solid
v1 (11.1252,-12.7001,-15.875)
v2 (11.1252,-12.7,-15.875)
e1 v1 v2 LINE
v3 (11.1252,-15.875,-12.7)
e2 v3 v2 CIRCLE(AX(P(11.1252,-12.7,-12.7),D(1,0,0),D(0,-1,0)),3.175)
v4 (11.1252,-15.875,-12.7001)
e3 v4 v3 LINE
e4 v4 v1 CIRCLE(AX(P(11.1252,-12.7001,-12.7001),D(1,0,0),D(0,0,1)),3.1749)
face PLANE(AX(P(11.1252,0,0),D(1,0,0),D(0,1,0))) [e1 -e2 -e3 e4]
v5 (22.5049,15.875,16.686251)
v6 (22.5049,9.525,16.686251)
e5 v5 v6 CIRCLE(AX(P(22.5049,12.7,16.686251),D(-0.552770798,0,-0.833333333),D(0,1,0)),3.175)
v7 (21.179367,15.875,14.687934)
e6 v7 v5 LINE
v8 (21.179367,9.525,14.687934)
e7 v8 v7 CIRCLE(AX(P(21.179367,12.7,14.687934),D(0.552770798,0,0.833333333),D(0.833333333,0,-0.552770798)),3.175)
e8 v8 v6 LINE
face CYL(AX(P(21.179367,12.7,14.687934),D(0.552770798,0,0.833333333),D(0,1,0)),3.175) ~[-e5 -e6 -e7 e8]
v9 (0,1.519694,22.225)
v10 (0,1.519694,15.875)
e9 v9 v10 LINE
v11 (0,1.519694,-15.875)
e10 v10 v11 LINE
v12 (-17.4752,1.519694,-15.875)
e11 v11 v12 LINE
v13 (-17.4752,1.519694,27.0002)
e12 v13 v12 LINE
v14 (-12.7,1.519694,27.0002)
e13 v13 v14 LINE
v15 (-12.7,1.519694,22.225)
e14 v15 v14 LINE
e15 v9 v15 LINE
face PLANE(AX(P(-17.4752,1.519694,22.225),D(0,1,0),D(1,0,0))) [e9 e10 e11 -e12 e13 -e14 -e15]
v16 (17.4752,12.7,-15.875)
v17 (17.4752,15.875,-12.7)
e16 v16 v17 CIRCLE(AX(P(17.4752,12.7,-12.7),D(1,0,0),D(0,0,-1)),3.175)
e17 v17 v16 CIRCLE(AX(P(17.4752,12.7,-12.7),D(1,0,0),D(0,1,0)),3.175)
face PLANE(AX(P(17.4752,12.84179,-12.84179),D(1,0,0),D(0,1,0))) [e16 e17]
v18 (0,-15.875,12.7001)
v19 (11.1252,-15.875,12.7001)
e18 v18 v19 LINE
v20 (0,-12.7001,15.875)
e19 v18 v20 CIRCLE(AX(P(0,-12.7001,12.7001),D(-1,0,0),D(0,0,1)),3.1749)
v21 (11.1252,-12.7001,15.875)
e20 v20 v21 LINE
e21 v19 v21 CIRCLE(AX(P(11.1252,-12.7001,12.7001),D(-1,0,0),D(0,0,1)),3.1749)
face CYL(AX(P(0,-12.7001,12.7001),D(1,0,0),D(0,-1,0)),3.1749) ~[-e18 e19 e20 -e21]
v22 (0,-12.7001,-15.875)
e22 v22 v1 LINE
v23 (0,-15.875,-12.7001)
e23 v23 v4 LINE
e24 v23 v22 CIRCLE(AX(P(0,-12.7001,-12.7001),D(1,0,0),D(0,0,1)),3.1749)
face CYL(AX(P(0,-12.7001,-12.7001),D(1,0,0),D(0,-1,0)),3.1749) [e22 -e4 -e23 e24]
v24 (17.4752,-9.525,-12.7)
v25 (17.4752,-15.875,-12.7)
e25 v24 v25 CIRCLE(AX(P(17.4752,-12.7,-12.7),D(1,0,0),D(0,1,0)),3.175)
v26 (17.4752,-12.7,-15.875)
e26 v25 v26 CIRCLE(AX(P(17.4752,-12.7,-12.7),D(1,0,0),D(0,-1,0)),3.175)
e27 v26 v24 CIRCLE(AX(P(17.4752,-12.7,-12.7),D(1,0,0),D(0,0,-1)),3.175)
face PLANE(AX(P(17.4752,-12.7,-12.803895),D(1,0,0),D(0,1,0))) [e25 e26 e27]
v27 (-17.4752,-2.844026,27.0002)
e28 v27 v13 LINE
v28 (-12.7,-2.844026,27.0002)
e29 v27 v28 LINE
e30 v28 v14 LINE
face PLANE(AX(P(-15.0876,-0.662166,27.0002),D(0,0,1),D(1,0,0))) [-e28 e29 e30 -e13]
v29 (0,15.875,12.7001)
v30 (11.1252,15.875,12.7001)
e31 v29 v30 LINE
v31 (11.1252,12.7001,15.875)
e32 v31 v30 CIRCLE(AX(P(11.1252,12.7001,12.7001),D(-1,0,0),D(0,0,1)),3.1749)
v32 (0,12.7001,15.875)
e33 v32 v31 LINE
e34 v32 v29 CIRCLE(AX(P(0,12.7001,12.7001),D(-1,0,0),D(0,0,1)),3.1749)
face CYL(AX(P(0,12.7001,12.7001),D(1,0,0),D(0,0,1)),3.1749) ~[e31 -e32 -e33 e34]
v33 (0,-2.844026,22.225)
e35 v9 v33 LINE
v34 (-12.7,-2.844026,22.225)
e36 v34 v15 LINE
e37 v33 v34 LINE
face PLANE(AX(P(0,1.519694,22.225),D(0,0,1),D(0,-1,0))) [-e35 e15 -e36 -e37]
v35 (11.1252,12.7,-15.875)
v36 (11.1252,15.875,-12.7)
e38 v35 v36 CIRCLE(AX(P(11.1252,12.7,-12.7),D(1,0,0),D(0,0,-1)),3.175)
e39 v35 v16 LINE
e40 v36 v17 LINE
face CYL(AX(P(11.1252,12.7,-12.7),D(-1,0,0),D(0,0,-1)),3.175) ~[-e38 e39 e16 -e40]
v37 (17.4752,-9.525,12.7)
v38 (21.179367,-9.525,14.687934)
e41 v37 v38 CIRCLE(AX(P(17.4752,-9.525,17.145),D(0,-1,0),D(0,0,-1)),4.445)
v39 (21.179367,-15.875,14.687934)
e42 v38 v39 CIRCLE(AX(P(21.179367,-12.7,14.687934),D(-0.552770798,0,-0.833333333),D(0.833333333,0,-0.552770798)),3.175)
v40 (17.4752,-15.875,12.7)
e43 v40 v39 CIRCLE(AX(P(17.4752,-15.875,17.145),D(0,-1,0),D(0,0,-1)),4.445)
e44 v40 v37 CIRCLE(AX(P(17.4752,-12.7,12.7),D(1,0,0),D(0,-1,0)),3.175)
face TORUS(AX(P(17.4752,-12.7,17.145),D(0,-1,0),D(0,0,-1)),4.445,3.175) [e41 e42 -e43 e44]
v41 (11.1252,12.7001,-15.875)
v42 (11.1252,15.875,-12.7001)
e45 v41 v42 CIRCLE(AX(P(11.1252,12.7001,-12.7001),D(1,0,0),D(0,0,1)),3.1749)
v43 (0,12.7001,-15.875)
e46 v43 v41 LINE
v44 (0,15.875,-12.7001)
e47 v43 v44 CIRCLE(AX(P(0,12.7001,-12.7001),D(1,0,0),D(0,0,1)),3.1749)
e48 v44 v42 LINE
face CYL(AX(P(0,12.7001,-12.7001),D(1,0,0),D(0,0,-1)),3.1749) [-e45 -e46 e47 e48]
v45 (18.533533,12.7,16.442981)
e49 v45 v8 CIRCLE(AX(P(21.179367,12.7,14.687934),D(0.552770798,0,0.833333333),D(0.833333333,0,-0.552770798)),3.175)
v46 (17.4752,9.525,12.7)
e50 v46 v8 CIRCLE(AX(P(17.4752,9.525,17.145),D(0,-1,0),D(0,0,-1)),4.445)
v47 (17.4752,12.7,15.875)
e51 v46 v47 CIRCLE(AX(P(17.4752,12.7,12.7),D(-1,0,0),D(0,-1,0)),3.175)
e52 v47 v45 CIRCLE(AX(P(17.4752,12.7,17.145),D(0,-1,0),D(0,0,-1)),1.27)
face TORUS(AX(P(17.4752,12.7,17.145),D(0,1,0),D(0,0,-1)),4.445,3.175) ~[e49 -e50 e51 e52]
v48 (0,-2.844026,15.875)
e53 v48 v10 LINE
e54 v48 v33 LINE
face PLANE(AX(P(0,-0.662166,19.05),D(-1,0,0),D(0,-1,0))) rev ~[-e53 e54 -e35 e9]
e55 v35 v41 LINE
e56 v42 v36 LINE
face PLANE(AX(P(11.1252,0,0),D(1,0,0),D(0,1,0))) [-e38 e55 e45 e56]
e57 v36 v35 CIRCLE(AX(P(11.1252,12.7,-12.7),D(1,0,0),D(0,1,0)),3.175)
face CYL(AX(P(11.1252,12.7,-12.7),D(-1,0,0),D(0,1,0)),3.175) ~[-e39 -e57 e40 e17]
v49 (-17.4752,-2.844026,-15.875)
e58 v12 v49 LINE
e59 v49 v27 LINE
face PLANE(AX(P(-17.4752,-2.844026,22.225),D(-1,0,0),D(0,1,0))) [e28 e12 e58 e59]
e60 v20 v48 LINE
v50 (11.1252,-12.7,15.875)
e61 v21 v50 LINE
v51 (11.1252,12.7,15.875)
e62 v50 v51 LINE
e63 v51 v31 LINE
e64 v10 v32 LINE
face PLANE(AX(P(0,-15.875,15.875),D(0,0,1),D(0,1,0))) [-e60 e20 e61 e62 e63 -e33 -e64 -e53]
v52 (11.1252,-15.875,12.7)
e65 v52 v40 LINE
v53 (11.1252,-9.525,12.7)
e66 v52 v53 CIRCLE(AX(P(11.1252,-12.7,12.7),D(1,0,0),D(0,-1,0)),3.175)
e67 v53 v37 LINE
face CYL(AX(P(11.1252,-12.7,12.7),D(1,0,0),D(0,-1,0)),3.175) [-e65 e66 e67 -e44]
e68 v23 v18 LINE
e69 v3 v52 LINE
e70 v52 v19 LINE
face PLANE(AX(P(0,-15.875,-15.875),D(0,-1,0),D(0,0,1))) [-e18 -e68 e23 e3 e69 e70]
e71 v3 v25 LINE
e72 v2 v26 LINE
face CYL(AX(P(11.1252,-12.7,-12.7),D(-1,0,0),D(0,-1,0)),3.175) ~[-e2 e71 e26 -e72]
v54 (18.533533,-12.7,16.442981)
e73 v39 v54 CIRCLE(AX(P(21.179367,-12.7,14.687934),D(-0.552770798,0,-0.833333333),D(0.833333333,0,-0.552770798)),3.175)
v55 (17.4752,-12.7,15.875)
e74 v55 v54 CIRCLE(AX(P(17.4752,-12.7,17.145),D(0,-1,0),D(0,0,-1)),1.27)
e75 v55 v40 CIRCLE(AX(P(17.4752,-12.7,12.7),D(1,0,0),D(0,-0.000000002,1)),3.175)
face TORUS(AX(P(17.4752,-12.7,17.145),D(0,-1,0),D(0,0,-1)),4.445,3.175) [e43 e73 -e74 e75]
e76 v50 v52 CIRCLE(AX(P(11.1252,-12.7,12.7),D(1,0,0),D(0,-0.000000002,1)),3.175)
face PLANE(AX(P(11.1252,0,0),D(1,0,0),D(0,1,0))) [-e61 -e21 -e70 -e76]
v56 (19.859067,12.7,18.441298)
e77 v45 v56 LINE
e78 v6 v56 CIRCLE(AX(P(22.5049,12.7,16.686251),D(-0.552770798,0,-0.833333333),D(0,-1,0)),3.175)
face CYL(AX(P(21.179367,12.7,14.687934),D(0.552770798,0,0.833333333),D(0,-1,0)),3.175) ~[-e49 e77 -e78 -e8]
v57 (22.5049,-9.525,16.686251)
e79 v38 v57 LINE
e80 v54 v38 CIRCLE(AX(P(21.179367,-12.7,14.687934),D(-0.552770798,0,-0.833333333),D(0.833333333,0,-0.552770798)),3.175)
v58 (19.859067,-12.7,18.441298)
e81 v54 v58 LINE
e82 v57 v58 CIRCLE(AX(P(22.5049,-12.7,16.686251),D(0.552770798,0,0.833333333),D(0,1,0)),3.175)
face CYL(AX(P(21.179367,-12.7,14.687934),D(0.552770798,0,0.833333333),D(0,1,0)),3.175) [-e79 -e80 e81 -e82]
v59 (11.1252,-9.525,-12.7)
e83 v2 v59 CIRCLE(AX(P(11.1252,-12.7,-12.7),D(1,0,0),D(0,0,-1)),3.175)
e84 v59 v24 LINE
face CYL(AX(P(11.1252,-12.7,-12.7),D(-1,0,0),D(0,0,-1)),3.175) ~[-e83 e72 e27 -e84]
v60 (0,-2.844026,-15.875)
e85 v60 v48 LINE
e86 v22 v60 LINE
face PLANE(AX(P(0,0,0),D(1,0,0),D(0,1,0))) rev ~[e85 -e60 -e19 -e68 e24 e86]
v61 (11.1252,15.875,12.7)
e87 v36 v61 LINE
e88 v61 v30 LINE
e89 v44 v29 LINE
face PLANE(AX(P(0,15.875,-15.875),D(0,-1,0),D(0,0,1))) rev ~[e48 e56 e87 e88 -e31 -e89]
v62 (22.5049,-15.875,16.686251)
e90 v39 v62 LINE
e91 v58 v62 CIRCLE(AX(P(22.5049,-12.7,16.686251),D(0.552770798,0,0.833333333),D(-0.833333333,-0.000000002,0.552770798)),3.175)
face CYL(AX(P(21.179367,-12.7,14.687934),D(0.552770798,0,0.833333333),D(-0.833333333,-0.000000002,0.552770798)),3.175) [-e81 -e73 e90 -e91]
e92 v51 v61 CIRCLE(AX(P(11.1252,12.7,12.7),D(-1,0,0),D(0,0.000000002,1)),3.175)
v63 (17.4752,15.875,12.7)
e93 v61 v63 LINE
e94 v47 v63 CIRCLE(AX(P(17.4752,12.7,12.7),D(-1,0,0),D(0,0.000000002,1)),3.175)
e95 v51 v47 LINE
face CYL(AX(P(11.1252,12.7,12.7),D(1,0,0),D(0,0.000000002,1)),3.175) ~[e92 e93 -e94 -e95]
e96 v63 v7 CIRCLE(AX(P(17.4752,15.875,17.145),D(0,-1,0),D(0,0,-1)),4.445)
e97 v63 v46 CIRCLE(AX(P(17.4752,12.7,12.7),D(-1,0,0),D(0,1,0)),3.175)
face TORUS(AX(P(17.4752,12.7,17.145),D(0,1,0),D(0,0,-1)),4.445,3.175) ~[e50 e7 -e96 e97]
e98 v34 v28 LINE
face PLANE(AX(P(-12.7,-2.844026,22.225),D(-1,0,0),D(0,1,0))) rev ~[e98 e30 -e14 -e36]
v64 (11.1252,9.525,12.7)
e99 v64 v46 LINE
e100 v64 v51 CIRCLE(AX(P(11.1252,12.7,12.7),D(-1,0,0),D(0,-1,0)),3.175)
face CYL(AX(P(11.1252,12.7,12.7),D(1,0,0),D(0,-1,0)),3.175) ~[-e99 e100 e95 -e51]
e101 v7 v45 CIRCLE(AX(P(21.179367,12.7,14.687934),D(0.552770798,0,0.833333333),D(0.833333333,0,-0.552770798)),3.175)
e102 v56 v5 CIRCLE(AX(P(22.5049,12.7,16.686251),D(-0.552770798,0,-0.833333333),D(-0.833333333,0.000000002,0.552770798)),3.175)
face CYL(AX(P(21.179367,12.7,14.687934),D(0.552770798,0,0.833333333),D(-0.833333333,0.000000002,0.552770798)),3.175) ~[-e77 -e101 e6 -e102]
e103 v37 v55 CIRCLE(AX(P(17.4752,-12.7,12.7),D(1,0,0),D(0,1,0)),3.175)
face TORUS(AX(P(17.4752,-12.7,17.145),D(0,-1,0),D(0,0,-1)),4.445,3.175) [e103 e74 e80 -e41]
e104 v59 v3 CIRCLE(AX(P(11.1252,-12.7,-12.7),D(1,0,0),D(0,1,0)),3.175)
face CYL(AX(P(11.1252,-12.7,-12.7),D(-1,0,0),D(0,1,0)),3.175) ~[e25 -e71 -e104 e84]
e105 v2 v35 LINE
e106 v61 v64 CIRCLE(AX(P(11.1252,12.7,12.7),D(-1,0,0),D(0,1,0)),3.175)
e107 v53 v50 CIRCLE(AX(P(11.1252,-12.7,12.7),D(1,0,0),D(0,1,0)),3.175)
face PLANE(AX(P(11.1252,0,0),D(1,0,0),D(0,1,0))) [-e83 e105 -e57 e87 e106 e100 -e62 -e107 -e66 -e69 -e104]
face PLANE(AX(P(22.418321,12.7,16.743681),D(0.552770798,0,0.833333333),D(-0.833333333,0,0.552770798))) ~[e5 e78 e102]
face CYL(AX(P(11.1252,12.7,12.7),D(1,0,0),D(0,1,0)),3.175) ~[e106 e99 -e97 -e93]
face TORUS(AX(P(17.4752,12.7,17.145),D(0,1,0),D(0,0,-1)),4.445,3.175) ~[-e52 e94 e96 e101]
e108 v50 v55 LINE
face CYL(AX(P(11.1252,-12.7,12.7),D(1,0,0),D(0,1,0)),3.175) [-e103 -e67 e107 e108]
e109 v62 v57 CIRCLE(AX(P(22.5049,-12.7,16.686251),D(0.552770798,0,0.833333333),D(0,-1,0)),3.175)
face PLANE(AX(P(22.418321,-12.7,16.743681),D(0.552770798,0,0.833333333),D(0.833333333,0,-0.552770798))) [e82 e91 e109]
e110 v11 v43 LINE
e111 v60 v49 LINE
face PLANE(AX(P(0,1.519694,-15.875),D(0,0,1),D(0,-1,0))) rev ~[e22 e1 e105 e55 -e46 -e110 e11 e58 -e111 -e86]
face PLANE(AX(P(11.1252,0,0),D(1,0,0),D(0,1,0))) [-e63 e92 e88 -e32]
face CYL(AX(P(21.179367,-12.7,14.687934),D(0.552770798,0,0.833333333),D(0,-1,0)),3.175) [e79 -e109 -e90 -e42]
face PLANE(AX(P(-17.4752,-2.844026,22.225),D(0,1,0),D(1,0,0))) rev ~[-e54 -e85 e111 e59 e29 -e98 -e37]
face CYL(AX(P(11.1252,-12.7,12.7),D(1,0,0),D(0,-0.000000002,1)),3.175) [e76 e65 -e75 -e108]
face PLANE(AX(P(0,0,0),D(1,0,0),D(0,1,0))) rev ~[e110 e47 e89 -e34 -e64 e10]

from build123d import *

# Parameters (mm, degrees)
F0_W      = 31.75
F0_H      = 31.75
F1_DEPTH  = 11.1252
F10_DEPTH = 6.35
F11_R     = 3.1749
F12_W     = 4.36372
F12_H     = 6.35
F12_H_2   = 31.75
F13_DEPTH = 17.4752
F14_W     = 4.7752
F14_H     = 4.36372
F15_DEPTH = 4.7752


# Not quite as in the source:
# - a fillet or chamfer is up to 0.001 mm smaller than in the source, because OpenCascade refuses the exact size


with BuildPart() as f1:
    # F0 (on Right) → F1 (new body)
    with BuildSketch(Plane.YZ):
        Rectangle(F0_W, F0_H)
    extrude(amount=F1_DEPTH)

    # F6: sweep along a path in F5
    with BuildLine(Plane.XZ.offset(12.7)) as f6_path:
        Line((11.1252, 9.525), (17.4752, 9.525))
        ThreePointArc((17.4752, 9.525), (21.0785384003, 10.4308096264), (23.8252, 12.9328865162))
        Line((23.8252, 12.9328865162), (25.1507334947, 14.9312034475))
    # F2 (on face) → F6 (sweep)
    with BuildSketch(Plane.YZ.offset(11.1252)):
        with BuildLine():
            ThreePointArc((-15.875, 12.7), (-12.7, 9.525), (-9.525, 12.7))
            ThreePointArc((-9.525, 12.7), (-10.4549359718, 14.9450640323), (-12.7000000057, 15.875))
            ThreePointArc((-12.7000000057, 15.875), (-14.9450640323, 14.9450640282), (-15.875, 12.7))
        make_face()
    sweep(path=f6_path.line)

    # F9: F1 across plane


with BuildPart() as f1_1:
    add(f1.part)
    add(f1.part.mirror(Plane(origin=(0, 0, 15.875), x_dir=(1, 0, 0), z_dir=(0, -1, 0))))

    # F2 (on face) → F10 (join)
    with BuildSketch(Plane.YZ.offset(11.1252)):
        with BuildLine():
            ThreePointArc((-9.525, -12.7), (-12.7, -9.525), (-15.875, -12.7))
            ThreePointArc((-15.875, -12.7), (-14.9450640303, -14.9450640303), (-12.7, -15.875))
            ThreePointArc((-12.7, -15.875), (-10.4549359697, -14.9450640303), (-9.525, -12.7))
        make_face()
        with BuildLine():
            ThreePointArc((12.7, -15.875), (14.9450640303, -14.9450640303), (15.875, -12.7))
            ThreePointArc((15.875, -12.7), (10.4549359697, -10.4549359697), (12.7, -15.875))
        make_face()
    extrude(amount=F10_DEPTH)

    # F11 (radius 3.175 in the source; OpenCascade refuses exactly that, so slightly less here)
    f11_edges = [f1_1.edges().sort_by_distance(p)[0] for p in [
        (5.5626, -15.875, 15.875),
        (5.5626, -15.875, -15.875),
        (5.5626, 15.875, -15.875),
        (5.5626, 15.875, 15.875),
    ]]
    fillet(f11_edges, radius=F11_R)

    # F12 (on face) → F13 (join)
    with BuildSketch(Plane(origin=(0, 0, 0), x_dir=(0, -1, 0), z_dir=(-1, 0, 0))):
        with Locations((0.6621663562, 19.05)):
            Rectangle(F12_W, F12_H)
        with Locations((0.6621663562, 0)):
            Rectangle(F12_W, F12_H_2)
    extrude(amount=F13_DEPTH)

    # F14 (on face) → F15 (join)
    with BuildSketch(Plane.XY.offset(22.225)):
        with Locations((-15.0876, -0.6621663562)):
            Rectangle(F14_W, F14_H)
    extrude(amount=F15_DEPTH)


solid = f1_1.part
